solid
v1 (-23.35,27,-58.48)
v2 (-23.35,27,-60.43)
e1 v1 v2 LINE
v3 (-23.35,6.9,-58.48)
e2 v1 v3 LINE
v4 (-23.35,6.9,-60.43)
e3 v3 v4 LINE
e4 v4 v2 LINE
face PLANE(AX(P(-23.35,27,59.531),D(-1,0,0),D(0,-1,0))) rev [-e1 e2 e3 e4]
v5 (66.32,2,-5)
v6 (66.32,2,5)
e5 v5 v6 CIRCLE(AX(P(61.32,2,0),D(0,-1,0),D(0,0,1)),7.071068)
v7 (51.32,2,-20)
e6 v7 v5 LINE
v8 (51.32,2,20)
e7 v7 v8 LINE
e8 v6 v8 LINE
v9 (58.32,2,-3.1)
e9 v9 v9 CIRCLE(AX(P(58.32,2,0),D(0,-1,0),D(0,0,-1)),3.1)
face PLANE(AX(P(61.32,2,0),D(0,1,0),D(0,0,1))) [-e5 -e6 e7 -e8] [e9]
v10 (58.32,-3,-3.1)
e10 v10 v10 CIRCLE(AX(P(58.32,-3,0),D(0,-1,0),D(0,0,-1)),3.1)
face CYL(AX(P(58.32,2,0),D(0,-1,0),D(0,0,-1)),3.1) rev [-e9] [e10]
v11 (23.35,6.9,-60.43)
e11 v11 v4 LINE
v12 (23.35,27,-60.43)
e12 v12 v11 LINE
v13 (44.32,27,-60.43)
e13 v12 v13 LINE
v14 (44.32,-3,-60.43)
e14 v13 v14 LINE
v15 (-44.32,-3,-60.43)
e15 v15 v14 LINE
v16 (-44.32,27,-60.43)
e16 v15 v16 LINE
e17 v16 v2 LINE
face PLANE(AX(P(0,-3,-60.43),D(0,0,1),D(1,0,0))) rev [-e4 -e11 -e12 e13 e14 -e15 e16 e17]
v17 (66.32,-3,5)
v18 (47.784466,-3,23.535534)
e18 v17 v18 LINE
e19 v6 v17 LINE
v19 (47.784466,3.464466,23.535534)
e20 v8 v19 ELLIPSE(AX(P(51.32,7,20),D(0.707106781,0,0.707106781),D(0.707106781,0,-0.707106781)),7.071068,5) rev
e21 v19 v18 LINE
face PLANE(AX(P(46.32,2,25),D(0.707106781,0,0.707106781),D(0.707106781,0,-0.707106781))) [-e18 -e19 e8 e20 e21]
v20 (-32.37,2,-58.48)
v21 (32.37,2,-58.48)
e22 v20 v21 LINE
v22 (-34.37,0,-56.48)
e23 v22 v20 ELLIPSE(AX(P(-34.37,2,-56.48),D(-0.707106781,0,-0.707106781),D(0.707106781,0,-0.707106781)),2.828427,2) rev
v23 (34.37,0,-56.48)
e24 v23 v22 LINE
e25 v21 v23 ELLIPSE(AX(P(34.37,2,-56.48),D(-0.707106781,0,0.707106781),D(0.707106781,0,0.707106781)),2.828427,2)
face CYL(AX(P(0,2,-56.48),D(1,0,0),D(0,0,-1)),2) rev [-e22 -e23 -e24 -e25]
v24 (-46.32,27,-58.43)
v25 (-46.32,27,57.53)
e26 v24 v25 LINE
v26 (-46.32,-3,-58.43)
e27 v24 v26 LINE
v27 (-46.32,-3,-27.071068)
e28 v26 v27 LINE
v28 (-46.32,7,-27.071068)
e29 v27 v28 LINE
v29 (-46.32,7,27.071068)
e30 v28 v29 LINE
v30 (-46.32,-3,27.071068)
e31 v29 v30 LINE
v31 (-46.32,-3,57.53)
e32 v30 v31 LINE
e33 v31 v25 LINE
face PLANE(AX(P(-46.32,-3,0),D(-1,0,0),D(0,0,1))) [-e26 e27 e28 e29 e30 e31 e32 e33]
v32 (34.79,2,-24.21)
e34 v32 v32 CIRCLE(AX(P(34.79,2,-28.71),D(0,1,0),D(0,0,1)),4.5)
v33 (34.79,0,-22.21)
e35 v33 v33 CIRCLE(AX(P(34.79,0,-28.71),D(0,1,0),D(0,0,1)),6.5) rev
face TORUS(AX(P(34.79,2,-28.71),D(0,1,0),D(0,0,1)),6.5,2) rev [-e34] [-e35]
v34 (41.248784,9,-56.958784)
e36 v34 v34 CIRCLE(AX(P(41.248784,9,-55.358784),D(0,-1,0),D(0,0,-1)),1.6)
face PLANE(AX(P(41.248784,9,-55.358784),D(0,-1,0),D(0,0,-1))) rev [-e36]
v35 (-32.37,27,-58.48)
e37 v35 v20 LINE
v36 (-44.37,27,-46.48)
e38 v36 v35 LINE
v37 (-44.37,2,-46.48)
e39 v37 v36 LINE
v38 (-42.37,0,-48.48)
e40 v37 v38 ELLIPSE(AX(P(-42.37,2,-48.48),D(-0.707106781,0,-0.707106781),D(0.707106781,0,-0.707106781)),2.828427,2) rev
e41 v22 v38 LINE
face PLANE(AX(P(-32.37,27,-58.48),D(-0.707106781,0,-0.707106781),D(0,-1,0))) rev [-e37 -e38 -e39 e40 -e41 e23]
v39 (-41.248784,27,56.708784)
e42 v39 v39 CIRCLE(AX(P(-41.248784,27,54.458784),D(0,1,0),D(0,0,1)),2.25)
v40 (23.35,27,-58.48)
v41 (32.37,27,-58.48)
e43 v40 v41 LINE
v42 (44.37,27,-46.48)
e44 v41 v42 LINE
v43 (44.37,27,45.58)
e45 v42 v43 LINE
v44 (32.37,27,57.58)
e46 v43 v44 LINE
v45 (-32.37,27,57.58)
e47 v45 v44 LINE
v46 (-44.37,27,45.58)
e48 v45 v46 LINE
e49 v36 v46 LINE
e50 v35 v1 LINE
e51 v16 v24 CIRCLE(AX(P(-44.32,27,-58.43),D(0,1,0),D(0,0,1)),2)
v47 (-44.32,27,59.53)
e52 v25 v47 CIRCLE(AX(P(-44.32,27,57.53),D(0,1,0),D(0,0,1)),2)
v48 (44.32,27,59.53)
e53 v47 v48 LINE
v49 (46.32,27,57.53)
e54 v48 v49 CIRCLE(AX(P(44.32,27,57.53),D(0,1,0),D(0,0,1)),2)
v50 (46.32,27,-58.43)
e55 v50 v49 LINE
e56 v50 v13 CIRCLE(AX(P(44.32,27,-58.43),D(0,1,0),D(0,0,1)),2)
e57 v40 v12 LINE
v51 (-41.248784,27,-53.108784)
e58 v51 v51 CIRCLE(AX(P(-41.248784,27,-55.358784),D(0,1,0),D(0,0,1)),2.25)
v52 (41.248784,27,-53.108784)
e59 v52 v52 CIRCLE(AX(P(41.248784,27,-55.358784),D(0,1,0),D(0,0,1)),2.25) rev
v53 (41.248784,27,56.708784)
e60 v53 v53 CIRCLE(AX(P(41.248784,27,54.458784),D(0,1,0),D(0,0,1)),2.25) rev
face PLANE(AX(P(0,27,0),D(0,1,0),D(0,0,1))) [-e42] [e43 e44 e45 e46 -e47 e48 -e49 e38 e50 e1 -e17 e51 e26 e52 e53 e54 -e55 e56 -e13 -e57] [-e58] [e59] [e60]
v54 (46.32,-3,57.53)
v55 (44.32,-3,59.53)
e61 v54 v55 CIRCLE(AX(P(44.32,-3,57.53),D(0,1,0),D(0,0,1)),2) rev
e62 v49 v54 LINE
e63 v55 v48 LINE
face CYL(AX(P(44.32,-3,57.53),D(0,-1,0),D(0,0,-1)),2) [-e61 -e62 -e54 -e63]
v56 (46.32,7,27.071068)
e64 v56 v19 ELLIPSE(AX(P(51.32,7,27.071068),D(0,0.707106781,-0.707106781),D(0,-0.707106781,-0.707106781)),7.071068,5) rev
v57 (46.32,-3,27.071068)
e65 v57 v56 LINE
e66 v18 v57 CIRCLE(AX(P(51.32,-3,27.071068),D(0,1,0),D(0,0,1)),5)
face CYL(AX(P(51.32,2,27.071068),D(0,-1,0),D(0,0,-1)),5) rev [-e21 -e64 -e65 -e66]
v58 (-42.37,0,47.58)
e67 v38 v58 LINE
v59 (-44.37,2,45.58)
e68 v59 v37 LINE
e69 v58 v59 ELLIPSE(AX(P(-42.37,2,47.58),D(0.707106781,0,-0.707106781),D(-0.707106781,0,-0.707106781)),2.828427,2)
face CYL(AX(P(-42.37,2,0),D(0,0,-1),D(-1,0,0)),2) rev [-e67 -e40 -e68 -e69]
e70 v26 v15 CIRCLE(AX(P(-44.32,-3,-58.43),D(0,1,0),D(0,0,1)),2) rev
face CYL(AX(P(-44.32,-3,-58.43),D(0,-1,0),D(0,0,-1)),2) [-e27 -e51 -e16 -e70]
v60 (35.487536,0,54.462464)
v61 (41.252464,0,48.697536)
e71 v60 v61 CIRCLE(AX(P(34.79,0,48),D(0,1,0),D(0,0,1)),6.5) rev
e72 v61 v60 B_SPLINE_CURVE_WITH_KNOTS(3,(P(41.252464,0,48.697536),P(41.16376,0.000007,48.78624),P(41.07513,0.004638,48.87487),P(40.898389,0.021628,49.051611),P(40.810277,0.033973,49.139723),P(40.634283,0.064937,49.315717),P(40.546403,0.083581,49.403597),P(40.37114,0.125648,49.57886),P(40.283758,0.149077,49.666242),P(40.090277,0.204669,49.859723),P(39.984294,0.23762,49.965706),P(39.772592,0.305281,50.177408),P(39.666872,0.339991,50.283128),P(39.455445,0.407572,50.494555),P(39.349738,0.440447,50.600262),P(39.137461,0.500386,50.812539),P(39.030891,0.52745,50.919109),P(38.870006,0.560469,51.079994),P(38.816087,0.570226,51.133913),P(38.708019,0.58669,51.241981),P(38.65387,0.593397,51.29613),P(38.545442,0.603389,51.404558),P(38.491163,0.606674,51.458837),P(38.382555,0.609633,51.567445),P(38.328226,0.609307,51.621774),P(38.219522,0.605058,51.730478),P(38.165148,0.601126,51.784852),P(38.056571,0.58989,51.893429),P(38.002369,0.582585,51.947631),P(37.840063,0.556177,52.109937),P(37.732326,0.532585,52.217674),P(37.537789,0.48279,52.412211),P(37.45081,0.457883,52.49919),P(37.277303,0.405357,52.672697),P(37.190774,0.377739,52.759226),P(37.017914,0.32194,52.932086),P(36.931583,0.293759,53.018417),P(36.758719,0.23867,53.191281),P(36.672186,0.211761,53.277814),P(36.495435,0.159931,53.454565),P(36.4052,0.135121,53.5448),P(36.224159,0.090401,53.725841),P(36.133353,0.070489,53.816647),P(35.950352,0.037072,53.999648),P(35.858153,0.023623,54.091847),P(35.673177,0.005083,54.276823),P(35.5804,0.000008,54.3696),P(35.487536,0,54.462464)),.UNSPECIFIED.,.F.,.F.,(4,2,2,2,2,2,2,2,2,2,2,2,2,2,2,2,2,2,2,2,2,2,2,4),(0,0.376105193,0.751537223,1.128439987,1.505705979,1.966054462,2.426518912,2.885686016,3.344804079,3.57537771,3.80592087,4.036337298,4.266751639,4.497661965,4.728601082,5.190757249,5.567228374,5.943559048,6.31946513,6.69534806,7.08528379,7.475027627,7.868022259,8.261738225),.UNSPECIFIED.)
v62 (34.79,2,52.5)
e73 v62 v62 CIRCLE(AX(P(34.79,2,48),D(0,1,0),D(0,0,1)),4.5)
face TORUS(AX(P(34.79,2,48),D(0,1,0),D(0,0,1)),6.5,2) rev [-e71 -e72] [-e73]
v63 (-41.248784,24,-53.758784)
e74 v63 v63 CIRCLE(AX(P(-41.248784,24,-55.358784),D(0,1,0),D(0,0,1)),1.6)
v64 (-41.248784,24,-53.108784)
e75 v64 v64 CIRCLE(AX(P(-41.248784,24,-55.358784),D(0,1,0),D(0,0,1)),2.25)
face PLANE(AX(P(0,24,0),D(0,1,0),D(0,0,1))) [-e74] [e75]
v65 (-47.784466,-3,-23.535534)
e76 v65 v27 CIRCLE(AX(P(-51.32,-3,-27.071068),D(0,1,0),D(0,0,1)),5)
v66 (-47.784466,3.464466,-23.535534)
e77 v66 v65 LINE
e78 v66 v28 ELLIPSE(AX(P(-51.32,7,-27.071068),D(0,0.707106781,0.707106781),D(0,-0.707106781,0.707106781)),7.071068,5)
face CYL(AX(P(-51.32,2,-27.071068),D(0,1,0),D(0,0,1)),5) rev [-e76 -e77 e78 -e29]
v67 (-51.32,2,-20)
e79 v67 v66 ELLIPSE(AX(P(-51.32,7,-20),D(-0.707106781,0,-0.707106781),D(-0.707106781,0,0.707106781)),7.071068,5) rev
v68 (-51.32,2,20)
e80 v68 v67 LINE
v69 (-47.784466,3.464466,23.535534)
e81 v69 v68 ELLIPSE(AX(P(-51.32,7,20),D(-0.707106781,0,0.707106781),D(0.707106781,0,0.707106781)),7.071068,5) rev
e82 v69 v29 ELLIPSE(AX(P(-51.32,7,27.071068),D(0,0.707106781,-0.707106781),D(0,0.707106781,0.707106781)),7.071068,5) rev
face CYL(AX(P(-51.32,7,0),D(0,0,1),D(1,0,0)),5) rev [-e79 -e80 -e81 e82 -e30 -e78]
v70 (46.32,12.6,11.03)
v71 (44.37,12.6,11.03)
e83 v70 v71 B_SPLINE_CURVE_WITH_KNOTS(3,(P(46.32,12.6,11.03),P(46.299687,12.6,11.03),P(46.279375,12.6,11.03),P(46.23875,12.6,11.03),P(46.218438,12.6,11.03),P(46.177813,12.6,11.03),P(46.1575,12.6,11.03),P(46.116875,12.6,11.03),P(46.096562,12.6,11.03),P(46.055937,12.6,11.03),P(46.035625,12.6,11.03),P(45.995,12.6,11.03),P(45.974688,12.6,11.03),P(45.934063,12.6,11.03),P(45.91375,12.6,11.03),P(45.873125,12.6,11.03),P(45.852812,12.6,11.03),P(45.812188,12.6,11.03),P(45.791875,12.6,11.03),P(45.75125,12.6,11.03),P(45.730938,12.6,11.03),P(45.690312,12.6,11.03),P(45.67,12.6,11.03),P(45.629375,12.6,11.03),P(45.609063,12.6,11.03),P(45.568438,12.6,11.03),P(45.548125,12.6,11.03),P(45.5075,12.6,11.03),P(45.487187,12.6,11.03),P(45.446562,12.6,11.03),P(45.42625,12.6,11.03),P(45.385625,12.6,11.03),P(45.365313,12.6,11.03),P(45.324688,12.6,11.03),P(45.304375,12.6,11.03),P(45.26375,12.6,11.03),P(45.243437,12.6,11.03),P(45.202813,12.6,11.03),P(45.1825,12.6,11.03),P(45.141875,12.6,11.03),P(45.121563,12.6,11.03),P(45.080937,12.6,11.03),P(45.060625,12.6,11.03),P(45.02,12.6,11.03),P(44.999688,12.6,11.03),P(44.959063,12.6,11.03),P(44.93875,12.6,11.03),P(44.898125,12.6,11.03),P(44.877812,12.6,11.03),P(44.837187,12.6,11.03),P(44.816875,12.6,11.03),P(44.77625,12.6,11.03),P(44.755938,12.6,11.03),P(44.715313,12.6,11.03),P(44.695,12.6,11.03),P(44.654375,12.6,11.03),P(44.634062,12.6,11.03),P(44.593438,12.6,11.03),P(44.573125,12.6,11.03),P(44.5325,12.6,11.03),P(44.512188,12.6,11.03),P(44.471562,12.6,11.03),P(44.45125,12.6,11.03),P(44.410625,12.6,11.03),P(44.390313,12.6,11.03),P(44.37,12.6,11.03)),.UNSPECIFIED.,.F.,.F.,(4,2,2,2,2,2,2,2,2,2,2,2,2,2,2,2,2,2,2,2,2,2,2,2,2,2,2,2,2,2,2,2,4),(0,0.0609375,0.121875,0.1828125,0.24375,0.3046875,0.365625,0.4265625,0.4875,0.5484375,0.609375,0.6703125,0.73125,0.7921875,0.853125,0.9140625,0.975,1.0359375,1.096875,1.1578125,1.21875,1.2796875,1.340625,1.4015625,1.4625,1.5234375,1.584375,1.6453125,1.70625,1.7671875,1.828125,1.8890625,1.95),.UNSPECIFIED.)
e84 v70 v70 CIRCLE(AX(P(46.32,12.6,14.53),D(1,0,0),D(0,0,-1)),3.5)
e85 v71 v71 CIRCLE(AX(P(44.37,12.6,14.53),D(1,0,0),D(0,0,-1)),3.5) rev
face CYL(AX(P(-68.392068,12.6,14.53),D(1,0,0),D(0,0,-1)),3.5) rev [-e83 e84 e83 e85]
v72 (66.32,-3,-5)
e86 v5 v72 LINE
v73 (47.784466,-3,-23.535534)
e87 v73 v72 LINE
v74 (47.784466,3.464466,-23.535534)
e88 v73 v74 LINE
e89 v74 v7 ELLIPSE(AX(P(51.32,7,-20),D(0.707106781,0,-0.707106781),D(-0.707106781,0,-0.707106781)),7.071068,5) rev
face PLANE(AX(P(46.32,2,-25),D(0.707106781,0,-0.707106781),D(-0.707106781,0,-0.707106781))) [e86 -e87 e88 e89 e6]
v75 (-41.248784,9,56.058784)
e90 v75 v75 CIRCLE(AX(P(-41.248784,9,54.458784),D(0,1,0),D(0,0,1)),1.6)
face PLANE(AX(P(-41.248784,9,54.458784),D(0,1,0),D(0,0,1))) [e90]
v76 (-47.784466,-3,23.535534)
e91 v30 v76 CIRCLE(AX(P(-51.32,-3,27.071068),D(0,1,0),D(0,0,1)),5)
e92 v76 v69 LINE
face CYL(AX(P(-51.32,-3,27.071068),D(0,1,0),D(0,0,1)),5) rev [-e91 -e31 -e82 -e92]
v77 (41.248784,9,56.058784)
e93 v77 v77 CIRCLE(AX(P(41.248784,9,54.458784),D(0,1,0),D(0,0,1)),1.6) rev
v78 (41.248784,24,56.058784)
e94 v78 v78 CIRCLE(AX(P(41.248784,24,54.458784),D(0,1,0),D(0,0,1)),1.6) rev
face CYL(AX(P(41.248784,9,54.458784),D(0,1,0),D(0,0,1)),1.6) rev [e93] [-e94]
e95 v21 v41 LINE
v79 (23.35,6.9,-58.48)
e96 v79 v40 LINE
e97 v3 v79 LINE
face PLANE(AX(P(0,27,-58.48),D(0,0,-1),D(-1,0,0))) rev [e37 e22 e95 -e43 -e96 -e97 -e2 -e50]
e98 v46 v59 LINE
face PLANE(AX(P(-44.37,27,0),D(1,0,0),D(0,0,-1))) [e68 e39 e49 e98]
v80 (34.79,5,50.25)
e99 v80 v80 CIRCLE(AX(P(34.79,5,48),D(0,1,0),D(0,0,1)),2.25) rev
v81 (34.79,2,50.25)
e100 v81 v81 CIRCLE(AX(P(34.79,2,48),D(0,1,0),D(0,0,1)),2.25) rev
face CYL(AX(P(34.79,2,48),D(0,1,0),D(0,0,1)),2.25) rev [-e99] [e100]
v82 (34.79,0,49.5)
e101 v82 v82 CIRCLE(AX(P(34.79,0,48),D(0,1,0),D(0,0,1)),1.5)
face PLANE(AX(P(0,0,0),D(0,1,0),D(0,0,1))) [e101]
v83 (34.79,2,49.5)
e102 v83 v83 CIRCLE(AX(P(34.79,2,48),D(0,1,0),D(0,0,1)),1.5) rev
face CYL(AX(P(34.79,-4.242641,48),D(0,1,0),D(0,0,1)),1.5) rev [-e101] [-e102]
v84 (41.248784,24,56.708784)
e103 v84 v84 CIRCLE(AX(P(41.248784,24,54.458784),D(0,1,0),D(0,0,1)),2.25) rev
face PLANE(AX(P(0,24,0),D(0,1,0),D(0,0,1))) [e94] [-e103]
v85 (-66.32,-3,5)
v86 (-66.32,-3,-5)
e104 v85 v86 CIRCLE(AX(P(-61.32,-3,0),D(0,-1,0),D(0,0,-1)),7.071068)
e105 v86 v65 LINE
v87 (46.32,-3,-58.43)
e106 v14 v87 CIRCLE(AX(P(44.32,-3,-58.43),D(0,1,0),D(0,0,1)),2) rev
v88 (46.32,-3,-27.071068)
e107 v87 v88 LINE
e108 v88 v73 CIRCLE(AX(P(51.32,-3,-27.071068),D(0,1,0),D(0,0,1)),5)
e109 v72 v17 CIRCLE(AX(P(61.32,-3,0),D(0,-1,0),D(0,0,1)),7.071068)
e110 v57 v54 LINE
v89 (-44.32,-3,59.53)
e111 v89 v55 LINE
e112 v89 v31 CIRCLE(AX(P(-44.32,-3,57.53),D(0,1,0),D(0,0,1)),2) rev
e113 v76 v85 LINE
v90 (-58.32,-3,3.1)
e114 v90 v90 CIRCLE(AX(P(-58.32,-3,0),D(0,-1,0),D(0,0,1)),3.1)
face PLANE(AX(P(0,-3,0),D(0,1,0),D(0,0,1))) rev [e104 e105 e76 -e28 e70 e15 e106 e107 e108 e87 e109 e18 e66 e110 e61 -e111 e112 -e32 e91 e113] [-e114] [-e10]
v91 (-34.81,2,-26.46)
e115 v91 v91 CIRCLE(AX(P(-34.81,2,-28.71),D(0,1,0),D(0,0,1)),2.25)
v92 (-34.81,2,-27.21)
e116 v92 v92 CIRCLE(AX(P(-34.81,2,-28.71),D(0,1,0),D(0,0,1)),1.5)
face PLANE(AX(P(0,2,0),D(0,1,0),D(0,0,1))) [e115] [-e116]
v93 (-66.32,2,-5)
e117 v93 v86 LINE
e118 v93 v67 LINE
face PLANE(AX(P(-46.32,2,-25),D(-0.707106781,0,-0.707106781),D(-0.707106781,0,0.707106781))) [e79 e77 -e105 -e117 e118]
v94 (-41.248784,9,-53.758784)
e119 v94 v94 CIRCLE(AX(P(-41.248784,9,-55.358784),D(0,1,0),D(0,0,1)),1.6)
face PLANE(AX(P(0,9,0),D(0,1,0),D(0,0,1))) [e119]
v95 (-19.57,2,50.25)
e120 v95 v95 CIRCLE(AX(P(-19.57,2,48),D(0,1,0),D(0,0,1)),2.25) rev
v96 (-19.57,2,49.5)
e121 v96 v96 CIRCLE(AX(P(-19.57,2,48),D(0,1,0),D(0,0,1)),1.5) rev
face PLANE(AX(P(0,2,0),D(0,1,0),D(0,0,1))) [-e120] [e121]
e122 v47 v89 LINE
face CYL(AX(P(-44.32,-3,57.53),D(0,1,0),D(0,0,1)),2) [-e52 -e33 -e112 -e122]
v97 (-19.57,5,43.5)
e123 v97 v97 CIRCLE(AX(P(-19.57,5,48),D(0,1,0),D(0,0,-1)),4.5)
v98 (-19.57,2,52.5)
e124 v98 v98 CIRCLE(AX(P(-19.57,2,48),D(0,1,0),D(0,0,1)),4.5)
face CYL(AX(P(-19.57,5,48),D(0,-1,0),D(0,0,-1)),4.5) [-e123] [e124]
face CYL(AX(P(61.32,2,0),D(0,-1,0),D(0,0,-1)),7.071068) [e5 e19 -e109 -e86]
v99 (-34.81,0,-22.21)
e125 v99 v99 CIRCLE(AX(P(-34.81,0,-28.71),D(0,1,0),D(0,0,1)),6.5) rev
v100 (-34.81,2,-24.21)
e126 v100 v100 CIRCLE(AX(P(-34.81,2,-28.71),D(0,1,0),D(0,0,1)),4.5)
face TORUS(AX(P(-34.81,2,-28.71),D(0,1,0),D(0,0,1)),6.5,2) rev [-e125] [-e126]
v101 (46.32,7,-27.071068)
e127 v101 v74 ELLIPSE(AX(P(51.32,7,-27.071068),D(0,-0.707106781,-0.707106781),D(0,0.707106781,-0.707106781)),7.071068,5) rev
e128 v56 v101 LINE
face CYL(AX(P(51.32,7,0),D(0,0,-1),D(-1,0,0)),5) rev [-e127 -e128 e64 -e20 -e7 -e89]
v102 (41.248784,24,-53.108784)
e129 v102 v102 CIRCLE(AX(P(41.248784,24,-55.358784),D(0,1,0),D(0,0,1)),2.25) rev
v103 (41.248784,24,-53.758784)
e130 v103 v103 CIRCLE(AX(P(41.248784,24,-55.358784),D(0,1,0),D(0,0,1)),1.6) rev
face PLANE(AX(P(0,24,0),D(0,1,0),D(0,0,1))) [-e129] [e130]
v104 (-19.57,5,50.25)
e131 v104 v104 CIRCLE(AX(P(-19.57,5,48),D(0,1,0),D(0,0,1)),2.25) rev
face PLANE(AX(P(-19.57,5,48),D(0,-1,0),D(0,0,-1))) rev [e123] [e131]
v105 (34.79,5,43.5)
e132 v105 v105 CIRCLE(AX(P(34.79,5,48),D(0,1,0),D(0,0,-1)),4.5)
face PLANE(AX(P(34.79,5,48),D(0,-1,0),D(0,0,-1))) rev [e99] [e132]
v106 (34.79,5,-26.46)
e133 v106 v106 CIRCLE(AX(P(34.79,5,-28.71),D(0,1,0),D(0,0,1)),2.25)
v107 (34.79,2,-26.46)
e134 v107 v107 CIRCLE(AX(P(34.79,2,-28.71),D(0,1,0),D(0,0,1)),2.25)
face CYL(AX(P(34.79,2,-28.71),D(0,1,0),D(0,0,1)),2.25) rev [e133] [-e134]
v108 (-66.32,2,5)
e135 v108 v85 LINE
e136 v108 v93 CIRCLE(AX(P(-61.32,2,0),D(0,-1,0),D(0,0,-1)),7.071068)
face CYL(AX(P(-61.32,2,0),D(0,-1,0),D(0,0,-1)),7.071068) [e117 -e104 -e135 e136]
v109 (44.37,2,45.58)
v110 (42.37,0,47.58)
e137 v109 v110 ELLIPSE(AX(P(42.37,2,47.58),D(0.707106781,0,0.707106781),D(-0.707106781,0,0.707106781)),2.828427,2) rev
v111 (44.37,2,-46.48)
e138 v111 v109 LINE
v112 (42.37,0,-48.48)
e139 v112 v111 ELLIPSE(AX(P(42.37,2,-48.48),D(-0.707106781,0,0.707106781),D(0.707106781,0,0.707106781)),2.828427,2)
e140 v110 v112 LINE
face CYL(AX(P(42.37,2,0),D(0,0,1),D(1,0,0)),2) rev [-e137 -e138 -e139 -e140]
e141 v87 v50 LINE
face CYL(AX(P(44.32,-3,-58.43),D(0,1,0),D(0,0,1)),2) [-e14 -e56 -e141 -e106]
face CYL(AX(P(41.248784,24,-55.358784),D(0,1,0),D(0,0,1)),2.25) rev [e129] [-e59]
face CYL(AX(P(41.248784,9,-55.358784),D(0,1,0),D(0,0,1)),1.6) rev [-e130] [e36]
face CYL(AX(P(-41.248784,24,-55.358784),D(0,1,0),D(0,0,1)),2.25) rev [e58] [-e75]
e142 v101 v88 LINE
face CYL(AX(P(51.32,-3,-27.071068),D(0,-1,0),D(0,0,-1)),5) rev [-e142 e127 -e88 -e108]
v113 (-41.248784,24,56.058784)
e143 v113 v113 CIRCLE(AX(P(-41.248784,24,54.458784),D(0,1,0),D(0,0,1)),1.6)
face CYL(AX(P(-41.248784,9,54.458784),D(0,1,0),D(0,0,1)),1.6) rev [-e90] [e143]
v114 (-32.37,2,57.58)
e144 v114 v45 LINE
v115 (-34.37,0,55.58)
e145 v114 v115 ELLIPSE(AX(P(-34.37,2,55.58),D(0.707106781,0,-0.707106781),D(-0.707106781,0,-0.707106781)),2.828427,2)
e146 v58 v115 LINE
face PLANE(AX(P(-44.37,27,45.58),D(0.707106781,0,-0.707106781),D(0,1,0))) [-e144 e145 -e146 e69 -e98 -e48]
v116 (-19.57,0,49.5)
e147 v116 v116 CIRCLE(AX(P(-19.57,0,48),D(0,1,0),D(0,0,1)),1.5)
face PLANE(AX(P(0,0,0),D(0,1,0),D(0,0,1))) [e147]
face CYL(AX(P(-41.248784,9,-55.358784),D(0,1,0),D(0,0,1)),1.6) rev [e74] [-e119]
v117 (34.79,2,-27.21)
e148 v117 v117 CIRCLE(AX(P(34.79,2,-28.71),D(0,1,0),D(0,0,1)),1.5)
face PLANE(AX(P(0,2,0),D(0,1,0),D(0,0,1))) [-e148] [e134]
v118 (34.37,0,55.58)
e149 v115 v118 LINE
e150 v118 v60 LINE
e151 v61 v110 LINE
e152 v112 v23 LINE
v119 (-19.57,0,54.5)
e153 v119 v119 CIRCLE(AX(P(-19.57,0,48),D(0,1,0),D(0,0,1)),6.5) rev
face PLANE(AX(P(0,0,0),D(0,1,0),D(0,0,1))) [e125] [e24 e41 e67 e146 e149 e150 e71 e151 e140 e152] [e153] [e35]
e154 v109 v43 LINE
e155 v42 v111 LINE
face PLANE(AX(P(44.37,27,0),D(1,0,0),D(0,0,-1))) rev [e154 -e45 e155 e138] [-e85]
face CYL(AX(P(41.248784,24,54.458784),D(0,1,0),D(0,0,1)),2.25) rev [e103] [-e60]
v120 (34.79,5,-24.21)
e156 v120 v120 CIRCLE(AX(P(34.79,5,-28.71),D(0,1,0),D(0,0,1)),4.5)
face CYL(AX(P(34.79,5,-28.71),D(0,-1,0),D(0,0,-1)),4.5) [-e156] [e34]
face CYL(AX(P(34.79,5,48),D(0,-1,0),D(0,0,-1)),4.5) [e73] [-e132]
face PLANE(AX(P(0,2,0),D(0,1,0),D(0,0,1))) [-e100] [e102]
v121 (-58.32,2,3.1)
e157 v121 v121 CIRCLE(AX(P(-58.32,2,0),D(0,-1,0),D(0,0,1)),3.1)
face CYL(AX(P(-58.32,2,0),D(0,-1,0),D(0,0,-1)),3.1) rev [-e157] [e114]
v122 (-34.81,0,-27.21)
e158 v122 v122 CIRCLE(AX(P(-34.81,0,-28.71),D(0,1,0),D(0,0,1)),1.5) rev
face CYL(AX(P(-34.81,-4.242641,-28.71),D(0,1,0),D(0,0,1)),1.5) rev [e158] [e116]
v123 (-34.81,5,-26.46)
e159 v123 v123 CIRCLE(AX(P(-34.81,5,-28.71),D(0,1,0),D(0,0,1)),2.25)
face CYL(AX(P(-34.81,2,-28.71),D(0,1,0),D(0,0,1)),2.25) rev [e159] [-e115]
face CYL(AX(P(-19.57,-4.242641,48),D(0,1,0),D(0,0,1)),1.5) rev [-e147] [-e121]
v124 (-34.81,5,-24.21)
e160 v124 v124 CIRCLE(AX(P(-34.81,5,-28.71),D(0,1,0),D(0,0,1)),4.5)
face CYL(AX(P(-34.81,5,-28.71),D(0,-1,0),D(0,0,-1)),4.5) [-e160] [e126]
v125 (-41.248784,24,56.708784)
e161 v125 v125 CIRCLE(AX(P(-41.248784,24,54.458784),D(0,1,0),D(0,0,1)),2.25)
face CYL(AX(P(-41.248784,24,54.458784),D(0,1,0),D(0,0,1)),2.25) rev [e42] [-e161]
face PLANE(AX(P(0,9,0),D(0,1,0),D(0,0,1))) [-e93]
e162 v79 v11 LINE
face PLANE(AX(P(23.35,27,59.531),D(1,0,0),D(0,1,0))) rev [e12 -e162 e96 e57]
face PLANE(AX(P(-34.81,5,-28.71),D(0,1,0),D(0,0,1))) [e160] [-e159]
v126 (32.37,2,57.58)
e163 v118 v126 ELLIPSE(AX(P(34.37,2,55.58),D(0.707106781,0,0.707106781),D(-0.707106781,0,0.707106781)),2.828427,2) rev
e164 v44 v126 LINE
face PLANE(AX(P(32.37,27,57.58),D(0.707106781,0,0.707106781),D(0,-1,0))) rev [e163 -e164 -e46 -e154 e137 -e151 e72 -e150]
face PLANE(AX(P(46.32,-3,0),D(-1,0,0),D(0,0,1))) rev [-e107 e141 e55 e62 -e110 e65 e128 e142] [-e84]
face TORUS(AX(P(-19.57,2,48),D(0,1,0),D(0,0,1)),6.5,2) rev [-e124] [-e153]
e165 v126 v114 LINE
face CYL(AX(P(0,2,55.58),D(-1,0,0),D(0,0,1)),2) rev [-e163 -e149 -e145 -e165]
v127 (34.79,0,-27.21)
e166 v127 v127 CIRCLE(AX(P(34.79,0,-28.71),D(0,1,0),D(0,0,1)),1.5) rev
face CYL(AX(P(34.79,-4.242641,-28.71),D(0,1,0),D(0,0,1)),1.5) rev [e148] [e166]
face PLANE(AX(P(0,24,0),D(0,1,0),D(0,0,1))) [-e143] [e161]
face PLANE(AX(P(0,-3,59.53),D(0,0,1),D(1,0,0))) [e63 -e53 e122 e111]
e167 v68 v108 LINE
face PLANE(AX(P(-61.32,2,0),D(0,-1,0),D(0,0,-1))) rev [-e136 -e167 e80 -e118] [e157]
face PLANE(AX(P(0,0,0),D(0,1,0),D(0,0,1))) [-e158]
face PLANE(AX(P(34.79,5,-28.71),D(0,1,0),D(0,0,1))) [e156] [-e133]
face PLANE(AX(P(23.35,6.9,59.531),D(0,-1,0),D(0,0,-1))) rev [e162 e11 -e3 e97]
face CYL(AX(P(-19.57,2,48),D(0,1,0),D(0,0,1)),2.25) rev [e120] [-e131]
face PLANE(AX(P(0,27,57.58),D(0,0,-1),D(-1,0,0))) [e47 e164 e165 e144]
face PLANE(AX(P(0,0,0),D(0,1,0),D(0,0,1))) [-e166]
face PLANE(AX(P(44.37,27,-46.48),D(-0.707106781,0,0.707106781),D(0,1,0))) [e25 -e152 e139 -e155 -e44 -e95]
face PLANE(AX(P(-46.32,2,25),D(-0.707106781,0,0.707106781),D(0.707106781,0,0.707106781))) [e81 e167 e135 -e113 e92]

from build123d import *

# Parameters (mm, degrees)
ESQUISSE2_W              = 92.64
ESQUISSE2_H              = 119.96
ESQUISSE2_W_2            = 88.74
ESQUISSE2_H_2            = 116.06
BASE_DEPTH               = 3
ESQUISSE3_R              = 4.5
SUPPORT_PCB_DEPTH        = 5
ESQUISSE4_R              = 2.25
ESQUISSE4_R_2            = 1.5
INSERT_M3_PCB_DEPTH      = 3
ESQUISSE4_3_R            = 1.5
PASSAGE_M3_PCB_DEPTH     = 5
ESQUISSE2_4_W            = 92.64
ESQUISSE2_4_H            = 119.96
ESQUISSE2_4_W_2          = 88.74
ESQUISSE2_4_H_2          = 116.06
WALLS_DEPTH              = 27
OUVERTURE_CONN_CMC_REACH = 133.396
ESQUISSE5_W              = 46.7
ESQUISSE5_H              = 20.1
CHANFREIN1_SIZE          = 12
CONG_1_R                 = 2
ESQUISSE6_R              = 2.25
INSERT_M3_BOX_DEPTH      = 3
ESQUISSE6_3_R            = 1.6
PASSAGE_M3_BOX_DEPTH     = 18
ESQUISSE10_R             = 3.1
BOSS_EXTRU_2_DEPTH       = 5
CONG_4_R                 = 5
PASSAGE_MAP_REACH        = 134.436
ESQUISSE11_R             = 3.5


with BuildPart() as part:
    # Esquisse2 → Base (new body)
    # profile 1 of 2: a face of its own
    with BuildSketch(Plane(origin=(0, 0, 0), x_dir=(1, 0, 0), z_dir=(0, 1, 0))):
        with Locations((0, 0.45)):
            Rectangle(ESQUISSE2_W, ESQUISSE2_H)
        with Locations((0, 0.45)):
            Rectangle(ESQUISSE2_W_2, ESQUISSE2_H_2, mode=Mode.SUBTRACT)
    # profile 2 of 2: a face of its own
    with BuildSketch(Plane(origin=(0, 0, 0), x_dir=(1, 0, 0), z_dir=(0, 1, 0))):
        with Locations((0, 0.45)):
            Rectangle(ESQUISSE2_W_2, ESQUISSE2_H_2)
    extrude(amount=-BASE_DEPTH)

    # Esquisse3 → Support_PCB (add)
    with BuildSketch(Plane(origin=(0, 0, 0), x_dir=(1, 0, 0), z_dir=(0, 1, 0))):
        with Locations(Location((-34.81, 28.71, 0), (0, 0, 270))):
            Circle(ESQUISSE3_R)
        with Locations(Location((34.79, 28.71, 0), (0, 0, 270))):
            Circle(ESQUISSE3_R)
        with Locations(Location((-19.57, -48, 0), (0, 0, 90))):
            Circle(ESQUISSE3_R)
        with Locations(Location((34.79, -48, 0), (0, 0, 90))):
            Circle(ESQUISSE3_R)
    extrude(amount=SUPPORT_PCB_DEPTH)

    # Esquisse4 → Insert_M3_PCB (cut)
    # profile 1 of 8: a face of its own
    with BuildSketch(Plane(origin=(0, 5, 0), x_dir=(1, 0, 0), z_dir=(0, 1, 0))):
        with Locations(Location((-34.81, 28.71, 0), (0, 0, 270))):
            Circle(ESQUISSE4_R)
        with Locations((-34.81, 28.71)):
            Circle(ESQUISSE4_R_2, mode=Mode.SUBTRACT)
    # profile 2 of 8: a face of its own
    with BuildSketch(Plane(origin=(0, 5, 0), x_dir=(1, 0, 0), z_dir=(0, 1, 0))):
        with Locations((-34.81, 28.71)):
            Circle(ESQUISSE4_R_2)
    # profile 3 of 8: a face of its own
    with BuildSketch(Plane(origin=(0, 5, 0), x_dir=(1, 0, 0), z_dir=(0, 1, 0))):
        with Locations(Location((34.79, 28.71, 0), (0, 0, 270))):
            Circle(ESQUISSE4_R)
        with Locations((34.79, 28.71)):
            Circle(ESQUISSE4_R_2, mode=Mode.SUBTRACT)
    # profile 4 of 8: a face of its own
    with BuildSketch(Plane(origin=(0, 5, 0), x_dir=(1, 0, 0), z_dir=(0, 1, 0))):
        with Locations((34.79, 28.71)):
            Circle(ESQUISSE4_R_2)
    # profile 5 of 8: a face of its own
    with BuildSketch(Plane(origin=(0, 5, 0), x_dir=(1, 0, 0), z_dir=(0, 1, 0))):
        with Locations(Location((34.79, -48, 0), (0, 0, 270))):
            Circle(ESQUISSE4_R)
        with Locations((34.79, -48)):
            Circle(ESQUISSE4_R_2, mode=Mode.SUBTRACT)
    # profile 6 of 8: a face of its own
    with BuildSketch(Plane(origin=(0, 5, 0), x_dir=(1, 0, 0), z_dir=(0, 1, 0))):
        with Locations((34.79, -48)):
            Circle(ESQUISSE4_R_2)
    # profile 7 of 8: a face of its own
    with BuildSketch(Plane(origin=(0, 5, 0), x_dir=(1, 0, 0), z_dir=(0, 1, 0))):
        with Locations(Location((-19.57, -48, 0), (0, 0, 270))):
            Circle(ESQUISSE4_R)
        with Locations((-19.57, -48)):
            Circle(ESQUISSE4_R_2, mode=Mode.SUBTRACT)
    # profile 8 of 8: a face of its own
    with BuildSketch(Plane(origin=(0, 5, 0), x_dir=(1, 0, 0), z_dir=(0, 1, 0))):
        with Locations((-19.57, -48)):
            Circle(ESQUISSE4_R_2)
    extrude(amount=-INSERT_M3_PCB_DEPTH, mode=Mode.SUBTRACT)

    # Esquisse4<3> → Passage M3_PCB (cut)
    with BuildSketch(Plane(origin=(0, 5, 0), x_dir=(1, 0, 0), z_dir=(0, 1, 0))):
        with Locations(Location((-19.57, -48, 0), (0, 0, 270))):
            Circle(ESQUISSE4_3_R)
        with Locations(Location((34.79, -48, 0), (0, 0, 270))):
            Circle(ESQUISSE4_3_R)
        with Locations(Location((34.79, 28.71, 0), (0, 0, 270))):
            Circle(ESQUISSE4_3_R)
        with Locations(Location((-34.81, 28.71, 0), (0, 0, 270))):
            Circle(ESQUISSE4_3_R)
    extrude(amount=-PASSAGE_M3_PCB_DEPTH, mode=Mode.SUBTRACT)

    # Esquisse2<4> → Walls (add)
    with BuildSketch(Plane(origin=(0, 0, 0), x_dir=(1, 0, 0), z_dir=(0, 1, 0))):
        with Locations((0, 0.45)):
            Rectangle(ESQUISSE2_4_W, ESQUISSE2_4_H)
        with Locations((0, 0.45)):
            Rectangle(ESQUISSE2_4_W_2, ESQUISSE2_4_H_2, mode=Mode.SUBTRACT)
    extrude(amount=WALLS_DEPTH)

    # Esquisse5 → Ouverture_Conn_CMC (cut, up to next)
    with BuildSketch(Plane(origin=(0, 0, -60.43), x_dir=(-1, 0, 0), z_dir=(0, 0, -1)), mode=Mode.PRIVATE) as ouverture_conn_cmc_sk1:
        with Locations((0, 16.95)):
            Rectangle(ESQUISSE5_W, ESQUISSE5_H)
    ouverture_conn_cmc_tool1 = extrude(ouverture_conn_cmc_sk1.sketch, amount=-OUVERTURE_CONN_CMC_REACH, mode=Mode.PRIVATE) & part.part
    add(ouverture_conn_cmc_tool1.solids().sort_by_distance((0, 16.95, -60.43))[0], mode=Mode.SUBTRACT)

    # Chanfrein1
    chanfrein1_edges = [part.edges().sort_by_distance(p)[0] for p in [
        (-44.37, 13.5, -58.48),
        (44.37, 13.5, -58.48),
        (44.37, 13.5, 57.58),
        (-44.37, 13.5, 57.58),
    ]]
    chamfer(chanfrein1_edges, length=CHANFREIN1_SIZE)

    # Congé1
    # the kernel refuses this fillet: 2 mm, written as the material it adds along each edge
    with BuildSketch(Plane(origin=(-37.37, 0, -58.48), x_dir=(0, 1, 0), z_dir=(1, 0, 0)), Plane(origin=(37.37, 0, 57.58), x_dir=(0, 1, 0), z_dir=(-1, 0, 0))) as cong_1_piece_1:
        with BuildLine():
            CenterArc((CONG_1_R, CONG_1_R), CONG_1_R, 180, 90)
            Line((0, CONG_1_R), (0, 0))
            Line((0, 0), (CONG_1_R, 0))
        make_face()
    extrude(amount=74.74)
    with BuildSketch(Plane(origin=(44.37, 0, -51.48), x_dir=(0, 1, 0), z_dir=(0, 0, 1)), Plane(origin=(-44.37, 0, 50.58), x_dir=(0, 1, 0), z_dir=(0, 0, -1))) as cong_1_piece_2:
        with BuildLine():
            CenterArc((CONG_1_R, CONG_1_R), CONG_1_R, 180, 90)
            Line((0, CONG_1_R), (0, 0))
            Line((0, 0), (CONG_1_R, 0))
        make_face()
    extrude(amount=102.06)
    with BuildSketch(Plane(origin=(-34.81, 0, -28.71), x_dir=(0, 0, 1), z_dir=(-1, 0, 0))) as cong_1_piece_3:
        with BuildLine():
            CenterArc((4.5 + CONG_1_R, CONG_1_R), CONG_1_R, 180, 90)
            Line((4.5, CONG_1_R), (4.5, 0))
            Line((4.5, 0), (4.5 + CONG_1_R, 0))
        make_face()
    revolve(axis=Axis((-34.81, 0, -28.71), (0, 1, 0)))
    with BuildSketch(Plane(origin=(34.79, 0, -28.71), x_dir=(0, 0, 1), z_dir=(-1, 0, 0))) as cong_1_piece_4:
        with BuildLine():
            CenterArc((4.5 + CONG_1_R, CONG_1_R), CONG_1_R, 180, 90)
            Line((4.5, CONG_1_R), (4.5, 0))
            Line((4.5, 0), (4.5 + CONG_1_R, 0))
        make_face()
    revolve(axis=Axis((34.79, 0, -28.71), (0, 1, 0)))
    with BuildSketch(Plane(origin=(-19.57, 0, 48), x_dir=(0, 0, -1), z_dir=(1, 0, 0))) as cong_1_piece_5:
        with BuildLine():
            CenterArc((4.5 + CONG_1_R, CONG_1_R), CONG_1_R, 180, 90)
            Line((4.5, CONG_1_R), (4.5, 0))
            Line((4.5, 0), (4.5 + CONG_1_R, 0))
        make_face()
    revolve(axis=Axis((-19.57, 0, 48), (0, 1, 0)))
    with BuildSketch(Plane(origin=(34.79, 0, 48), x_dir=(0, 0, -1), z_dir=(1, 0, 0))) as cong_1_piece_6:
        with BuildLine():
            CenterArc((4.5 + CONG_1_R, CONG_1_R), CONG_1_R, 180, 90)
            Line((4.5, CONG_1_R), (4.5, 0))
            Line((4.5, 0), (4.5 + CONG_1_R, 0))
        make_face()
    revolve(axis=Axis((34.79, 0, 48), (0, 1, 0)))
    # the kernel refuses this fillet: 2 mm, written as the material it takes off along each edge
    with BuildSketch(Plane(origin=(46.32, 32, -60.43), x_dir=(-1, 0, 0), z_dir=(0, -1, 0)), Plane(origin=(46.32, 32, 59.53), x_dir=(0, 0, -1), z_dir=(0, -1, 0)), Plane(origin=(-46.32, -8, -60.43), x_dir=(1, 0, 0), z_dir=(0, 1, 0))) as cong_1_2_piece_1:
        with BuildLine():
            CenterArc((CONG_1_R, -CONG_1_R), CONG_1_R, 90, 90)
            Line((0, -CONG_1_R), (0, 0))
            Line((0, 0), (CONG_1_R, 0))
        make_face()
    extrude(amount=40, mode=Mode.SUBTRACT)
    with BuildSketch(Plane(origin=(-46.32, -8, 59.53), x_dir=(1, 0, 0), z_dir=(0, 1, 0))) as cong_1_2_piece_2:
        with BuildLine():
            CenterArc((CONG_1_R, CONG_1_R), CONG_1_R, 180, 90)
            Line((0, CONG_1_R), (0, 0))
            Line((0, 0), (CONG_1_R, 0))
        make_face()
    extrude(amount=40, mode=Mode.SUBTRACT)

    # Esquisse6 → Insert_M3_Box (cut)
    with BuildSketch(Plane(origin=(0, 27, 0), x_dir=(1, 0, 0), z_dir=(0, 1, 0))):
        with Locations(Location((-41.248784258, 55.358784258, 0), (0, 0, 270))):
            Circle(ESQUISSE6_R)
        with Locations(Location((-41.248784258, -54.458784258, 0), (0, 0, 270))):
            Circle(ESQUISSE6_R)
        with Locations(Location((41.248784258, 55.358784258, 0), (0, 0, 270))):
            Circle(ESQUISSE6_R)
        with Locations(Location((41.248784258, -54.458784258, 0), (0, 0, 270))):
            Circle(ESQUISSE6_R)
    extrude(amount=-INSERT_M3_BOX_DEPTH, mode=Mode.SUBTRACT)

    # Esquisse6<3> → Passage_M3_Box (cut)
    with BuildSketch(Plane(origin=(0, 27, 0), x_dir=(1, 0, 0), z_dir=(0, 1, 0))):
        with Locations(Location((-41.248784258, 55.358784258, 0), (0, 0, 270))):
            Circle(ESQUISSE6_3_R)
        with Locations(Location((-41.248784258, -54.458784258, 0), (0, 0, 270))):
            Circle(ESQUISSE6_3_R)
        with Locations(Location((41.248784258, 55.358784258, 0), (0, 0, 270))):
            Circle(ESQUISSE6_3_R)
        with Locations(Location((41.248784258, -54.458784258, 0), (0, 0, 270))):
            Circle(ESQUISSE6_3_R)
    extrude(amount=-PASSAGE_M3_BOX_DEPTH, mode=Mode.SUBTRACT)

    # Esquisse10 → Boss.-Extru.2 (add)
    # profile 1 of 2: a face of its own
    with BuildSketch(Plane.XZ.offset(3)):
        with BuildLine():
            Line((46.32, 25), (66.32, 5))
            ThreePointArc((66.32, 5), (68.391067812, 0), (66.32, -5))
            Line((66.32, -5), (46.32, -25))
            Line((46.32, -25), (46.32, 25))
        make_face()
        with Locations(Location((58.32, 0, 0), (0, 0, 270))):
            Circle(ESQUISSE10_R, mode=Mode.SUBTRACT)
    # profile 2 of 2: a face of its own
    with BuildSketch(Plane.XZ.offset(3)):
        with BuildLine():
            Line((-46.32, 25), (-66.32, 5))
            ThreePointArc((-66.32, 5), (-68.391067812, 0), (-66.32, -5))
            Line((-66.32, -5), (-46.32, -25))
            Line((-46.32, -25), (-46.32, 25))
        make_face()
        with Locations(Location((-58.32, 0, 0), (0, 0, 90))):
            Circle(ESQUISSE10_R, mode=Mode.SUBTRACT)
    extrude(amount=-BOSS_EXTRU_2_DEPTH)

    # Congé4
    cong_4_edges = [part.edges().sort_by_distance(p)[0] for p in [
        (46.32, 2, 0),
        (46.32, -0.5, -25),
        (46.32, -0.5, 25),
        (-46.32, 2, 0),
        (-46.32, -0.5, 25),
        (-46.32, -0.5, -25),
    ]]
    fillet(cong_4_edges, radius=CONG_4_R)

    # Esquisse11 → Passage_MAP (cut, up to next)
    with BuildSketch(Plane(origin=(46.32, 0, 0), x_dir=(0, 0, -1), z_dir=(1, 0, 0)), mode=Mode.PRIVATE) as passage_map_sk1:
        with Locations((-14.53, 12.6)):
            Circle(ESQUISSE11_R)
    passage_map_tool1 = extrude(passage_map_sk1.sketch, amount=-PASSAGE_MAP_REACH, mode=Mode.PRIVATE) & part.part
    add(passage_map_tool1.solids().sort_by_distance((46.32, 12.6, 14.53))[0], mode=Mode.SUBTRACT)


solid = part.part
